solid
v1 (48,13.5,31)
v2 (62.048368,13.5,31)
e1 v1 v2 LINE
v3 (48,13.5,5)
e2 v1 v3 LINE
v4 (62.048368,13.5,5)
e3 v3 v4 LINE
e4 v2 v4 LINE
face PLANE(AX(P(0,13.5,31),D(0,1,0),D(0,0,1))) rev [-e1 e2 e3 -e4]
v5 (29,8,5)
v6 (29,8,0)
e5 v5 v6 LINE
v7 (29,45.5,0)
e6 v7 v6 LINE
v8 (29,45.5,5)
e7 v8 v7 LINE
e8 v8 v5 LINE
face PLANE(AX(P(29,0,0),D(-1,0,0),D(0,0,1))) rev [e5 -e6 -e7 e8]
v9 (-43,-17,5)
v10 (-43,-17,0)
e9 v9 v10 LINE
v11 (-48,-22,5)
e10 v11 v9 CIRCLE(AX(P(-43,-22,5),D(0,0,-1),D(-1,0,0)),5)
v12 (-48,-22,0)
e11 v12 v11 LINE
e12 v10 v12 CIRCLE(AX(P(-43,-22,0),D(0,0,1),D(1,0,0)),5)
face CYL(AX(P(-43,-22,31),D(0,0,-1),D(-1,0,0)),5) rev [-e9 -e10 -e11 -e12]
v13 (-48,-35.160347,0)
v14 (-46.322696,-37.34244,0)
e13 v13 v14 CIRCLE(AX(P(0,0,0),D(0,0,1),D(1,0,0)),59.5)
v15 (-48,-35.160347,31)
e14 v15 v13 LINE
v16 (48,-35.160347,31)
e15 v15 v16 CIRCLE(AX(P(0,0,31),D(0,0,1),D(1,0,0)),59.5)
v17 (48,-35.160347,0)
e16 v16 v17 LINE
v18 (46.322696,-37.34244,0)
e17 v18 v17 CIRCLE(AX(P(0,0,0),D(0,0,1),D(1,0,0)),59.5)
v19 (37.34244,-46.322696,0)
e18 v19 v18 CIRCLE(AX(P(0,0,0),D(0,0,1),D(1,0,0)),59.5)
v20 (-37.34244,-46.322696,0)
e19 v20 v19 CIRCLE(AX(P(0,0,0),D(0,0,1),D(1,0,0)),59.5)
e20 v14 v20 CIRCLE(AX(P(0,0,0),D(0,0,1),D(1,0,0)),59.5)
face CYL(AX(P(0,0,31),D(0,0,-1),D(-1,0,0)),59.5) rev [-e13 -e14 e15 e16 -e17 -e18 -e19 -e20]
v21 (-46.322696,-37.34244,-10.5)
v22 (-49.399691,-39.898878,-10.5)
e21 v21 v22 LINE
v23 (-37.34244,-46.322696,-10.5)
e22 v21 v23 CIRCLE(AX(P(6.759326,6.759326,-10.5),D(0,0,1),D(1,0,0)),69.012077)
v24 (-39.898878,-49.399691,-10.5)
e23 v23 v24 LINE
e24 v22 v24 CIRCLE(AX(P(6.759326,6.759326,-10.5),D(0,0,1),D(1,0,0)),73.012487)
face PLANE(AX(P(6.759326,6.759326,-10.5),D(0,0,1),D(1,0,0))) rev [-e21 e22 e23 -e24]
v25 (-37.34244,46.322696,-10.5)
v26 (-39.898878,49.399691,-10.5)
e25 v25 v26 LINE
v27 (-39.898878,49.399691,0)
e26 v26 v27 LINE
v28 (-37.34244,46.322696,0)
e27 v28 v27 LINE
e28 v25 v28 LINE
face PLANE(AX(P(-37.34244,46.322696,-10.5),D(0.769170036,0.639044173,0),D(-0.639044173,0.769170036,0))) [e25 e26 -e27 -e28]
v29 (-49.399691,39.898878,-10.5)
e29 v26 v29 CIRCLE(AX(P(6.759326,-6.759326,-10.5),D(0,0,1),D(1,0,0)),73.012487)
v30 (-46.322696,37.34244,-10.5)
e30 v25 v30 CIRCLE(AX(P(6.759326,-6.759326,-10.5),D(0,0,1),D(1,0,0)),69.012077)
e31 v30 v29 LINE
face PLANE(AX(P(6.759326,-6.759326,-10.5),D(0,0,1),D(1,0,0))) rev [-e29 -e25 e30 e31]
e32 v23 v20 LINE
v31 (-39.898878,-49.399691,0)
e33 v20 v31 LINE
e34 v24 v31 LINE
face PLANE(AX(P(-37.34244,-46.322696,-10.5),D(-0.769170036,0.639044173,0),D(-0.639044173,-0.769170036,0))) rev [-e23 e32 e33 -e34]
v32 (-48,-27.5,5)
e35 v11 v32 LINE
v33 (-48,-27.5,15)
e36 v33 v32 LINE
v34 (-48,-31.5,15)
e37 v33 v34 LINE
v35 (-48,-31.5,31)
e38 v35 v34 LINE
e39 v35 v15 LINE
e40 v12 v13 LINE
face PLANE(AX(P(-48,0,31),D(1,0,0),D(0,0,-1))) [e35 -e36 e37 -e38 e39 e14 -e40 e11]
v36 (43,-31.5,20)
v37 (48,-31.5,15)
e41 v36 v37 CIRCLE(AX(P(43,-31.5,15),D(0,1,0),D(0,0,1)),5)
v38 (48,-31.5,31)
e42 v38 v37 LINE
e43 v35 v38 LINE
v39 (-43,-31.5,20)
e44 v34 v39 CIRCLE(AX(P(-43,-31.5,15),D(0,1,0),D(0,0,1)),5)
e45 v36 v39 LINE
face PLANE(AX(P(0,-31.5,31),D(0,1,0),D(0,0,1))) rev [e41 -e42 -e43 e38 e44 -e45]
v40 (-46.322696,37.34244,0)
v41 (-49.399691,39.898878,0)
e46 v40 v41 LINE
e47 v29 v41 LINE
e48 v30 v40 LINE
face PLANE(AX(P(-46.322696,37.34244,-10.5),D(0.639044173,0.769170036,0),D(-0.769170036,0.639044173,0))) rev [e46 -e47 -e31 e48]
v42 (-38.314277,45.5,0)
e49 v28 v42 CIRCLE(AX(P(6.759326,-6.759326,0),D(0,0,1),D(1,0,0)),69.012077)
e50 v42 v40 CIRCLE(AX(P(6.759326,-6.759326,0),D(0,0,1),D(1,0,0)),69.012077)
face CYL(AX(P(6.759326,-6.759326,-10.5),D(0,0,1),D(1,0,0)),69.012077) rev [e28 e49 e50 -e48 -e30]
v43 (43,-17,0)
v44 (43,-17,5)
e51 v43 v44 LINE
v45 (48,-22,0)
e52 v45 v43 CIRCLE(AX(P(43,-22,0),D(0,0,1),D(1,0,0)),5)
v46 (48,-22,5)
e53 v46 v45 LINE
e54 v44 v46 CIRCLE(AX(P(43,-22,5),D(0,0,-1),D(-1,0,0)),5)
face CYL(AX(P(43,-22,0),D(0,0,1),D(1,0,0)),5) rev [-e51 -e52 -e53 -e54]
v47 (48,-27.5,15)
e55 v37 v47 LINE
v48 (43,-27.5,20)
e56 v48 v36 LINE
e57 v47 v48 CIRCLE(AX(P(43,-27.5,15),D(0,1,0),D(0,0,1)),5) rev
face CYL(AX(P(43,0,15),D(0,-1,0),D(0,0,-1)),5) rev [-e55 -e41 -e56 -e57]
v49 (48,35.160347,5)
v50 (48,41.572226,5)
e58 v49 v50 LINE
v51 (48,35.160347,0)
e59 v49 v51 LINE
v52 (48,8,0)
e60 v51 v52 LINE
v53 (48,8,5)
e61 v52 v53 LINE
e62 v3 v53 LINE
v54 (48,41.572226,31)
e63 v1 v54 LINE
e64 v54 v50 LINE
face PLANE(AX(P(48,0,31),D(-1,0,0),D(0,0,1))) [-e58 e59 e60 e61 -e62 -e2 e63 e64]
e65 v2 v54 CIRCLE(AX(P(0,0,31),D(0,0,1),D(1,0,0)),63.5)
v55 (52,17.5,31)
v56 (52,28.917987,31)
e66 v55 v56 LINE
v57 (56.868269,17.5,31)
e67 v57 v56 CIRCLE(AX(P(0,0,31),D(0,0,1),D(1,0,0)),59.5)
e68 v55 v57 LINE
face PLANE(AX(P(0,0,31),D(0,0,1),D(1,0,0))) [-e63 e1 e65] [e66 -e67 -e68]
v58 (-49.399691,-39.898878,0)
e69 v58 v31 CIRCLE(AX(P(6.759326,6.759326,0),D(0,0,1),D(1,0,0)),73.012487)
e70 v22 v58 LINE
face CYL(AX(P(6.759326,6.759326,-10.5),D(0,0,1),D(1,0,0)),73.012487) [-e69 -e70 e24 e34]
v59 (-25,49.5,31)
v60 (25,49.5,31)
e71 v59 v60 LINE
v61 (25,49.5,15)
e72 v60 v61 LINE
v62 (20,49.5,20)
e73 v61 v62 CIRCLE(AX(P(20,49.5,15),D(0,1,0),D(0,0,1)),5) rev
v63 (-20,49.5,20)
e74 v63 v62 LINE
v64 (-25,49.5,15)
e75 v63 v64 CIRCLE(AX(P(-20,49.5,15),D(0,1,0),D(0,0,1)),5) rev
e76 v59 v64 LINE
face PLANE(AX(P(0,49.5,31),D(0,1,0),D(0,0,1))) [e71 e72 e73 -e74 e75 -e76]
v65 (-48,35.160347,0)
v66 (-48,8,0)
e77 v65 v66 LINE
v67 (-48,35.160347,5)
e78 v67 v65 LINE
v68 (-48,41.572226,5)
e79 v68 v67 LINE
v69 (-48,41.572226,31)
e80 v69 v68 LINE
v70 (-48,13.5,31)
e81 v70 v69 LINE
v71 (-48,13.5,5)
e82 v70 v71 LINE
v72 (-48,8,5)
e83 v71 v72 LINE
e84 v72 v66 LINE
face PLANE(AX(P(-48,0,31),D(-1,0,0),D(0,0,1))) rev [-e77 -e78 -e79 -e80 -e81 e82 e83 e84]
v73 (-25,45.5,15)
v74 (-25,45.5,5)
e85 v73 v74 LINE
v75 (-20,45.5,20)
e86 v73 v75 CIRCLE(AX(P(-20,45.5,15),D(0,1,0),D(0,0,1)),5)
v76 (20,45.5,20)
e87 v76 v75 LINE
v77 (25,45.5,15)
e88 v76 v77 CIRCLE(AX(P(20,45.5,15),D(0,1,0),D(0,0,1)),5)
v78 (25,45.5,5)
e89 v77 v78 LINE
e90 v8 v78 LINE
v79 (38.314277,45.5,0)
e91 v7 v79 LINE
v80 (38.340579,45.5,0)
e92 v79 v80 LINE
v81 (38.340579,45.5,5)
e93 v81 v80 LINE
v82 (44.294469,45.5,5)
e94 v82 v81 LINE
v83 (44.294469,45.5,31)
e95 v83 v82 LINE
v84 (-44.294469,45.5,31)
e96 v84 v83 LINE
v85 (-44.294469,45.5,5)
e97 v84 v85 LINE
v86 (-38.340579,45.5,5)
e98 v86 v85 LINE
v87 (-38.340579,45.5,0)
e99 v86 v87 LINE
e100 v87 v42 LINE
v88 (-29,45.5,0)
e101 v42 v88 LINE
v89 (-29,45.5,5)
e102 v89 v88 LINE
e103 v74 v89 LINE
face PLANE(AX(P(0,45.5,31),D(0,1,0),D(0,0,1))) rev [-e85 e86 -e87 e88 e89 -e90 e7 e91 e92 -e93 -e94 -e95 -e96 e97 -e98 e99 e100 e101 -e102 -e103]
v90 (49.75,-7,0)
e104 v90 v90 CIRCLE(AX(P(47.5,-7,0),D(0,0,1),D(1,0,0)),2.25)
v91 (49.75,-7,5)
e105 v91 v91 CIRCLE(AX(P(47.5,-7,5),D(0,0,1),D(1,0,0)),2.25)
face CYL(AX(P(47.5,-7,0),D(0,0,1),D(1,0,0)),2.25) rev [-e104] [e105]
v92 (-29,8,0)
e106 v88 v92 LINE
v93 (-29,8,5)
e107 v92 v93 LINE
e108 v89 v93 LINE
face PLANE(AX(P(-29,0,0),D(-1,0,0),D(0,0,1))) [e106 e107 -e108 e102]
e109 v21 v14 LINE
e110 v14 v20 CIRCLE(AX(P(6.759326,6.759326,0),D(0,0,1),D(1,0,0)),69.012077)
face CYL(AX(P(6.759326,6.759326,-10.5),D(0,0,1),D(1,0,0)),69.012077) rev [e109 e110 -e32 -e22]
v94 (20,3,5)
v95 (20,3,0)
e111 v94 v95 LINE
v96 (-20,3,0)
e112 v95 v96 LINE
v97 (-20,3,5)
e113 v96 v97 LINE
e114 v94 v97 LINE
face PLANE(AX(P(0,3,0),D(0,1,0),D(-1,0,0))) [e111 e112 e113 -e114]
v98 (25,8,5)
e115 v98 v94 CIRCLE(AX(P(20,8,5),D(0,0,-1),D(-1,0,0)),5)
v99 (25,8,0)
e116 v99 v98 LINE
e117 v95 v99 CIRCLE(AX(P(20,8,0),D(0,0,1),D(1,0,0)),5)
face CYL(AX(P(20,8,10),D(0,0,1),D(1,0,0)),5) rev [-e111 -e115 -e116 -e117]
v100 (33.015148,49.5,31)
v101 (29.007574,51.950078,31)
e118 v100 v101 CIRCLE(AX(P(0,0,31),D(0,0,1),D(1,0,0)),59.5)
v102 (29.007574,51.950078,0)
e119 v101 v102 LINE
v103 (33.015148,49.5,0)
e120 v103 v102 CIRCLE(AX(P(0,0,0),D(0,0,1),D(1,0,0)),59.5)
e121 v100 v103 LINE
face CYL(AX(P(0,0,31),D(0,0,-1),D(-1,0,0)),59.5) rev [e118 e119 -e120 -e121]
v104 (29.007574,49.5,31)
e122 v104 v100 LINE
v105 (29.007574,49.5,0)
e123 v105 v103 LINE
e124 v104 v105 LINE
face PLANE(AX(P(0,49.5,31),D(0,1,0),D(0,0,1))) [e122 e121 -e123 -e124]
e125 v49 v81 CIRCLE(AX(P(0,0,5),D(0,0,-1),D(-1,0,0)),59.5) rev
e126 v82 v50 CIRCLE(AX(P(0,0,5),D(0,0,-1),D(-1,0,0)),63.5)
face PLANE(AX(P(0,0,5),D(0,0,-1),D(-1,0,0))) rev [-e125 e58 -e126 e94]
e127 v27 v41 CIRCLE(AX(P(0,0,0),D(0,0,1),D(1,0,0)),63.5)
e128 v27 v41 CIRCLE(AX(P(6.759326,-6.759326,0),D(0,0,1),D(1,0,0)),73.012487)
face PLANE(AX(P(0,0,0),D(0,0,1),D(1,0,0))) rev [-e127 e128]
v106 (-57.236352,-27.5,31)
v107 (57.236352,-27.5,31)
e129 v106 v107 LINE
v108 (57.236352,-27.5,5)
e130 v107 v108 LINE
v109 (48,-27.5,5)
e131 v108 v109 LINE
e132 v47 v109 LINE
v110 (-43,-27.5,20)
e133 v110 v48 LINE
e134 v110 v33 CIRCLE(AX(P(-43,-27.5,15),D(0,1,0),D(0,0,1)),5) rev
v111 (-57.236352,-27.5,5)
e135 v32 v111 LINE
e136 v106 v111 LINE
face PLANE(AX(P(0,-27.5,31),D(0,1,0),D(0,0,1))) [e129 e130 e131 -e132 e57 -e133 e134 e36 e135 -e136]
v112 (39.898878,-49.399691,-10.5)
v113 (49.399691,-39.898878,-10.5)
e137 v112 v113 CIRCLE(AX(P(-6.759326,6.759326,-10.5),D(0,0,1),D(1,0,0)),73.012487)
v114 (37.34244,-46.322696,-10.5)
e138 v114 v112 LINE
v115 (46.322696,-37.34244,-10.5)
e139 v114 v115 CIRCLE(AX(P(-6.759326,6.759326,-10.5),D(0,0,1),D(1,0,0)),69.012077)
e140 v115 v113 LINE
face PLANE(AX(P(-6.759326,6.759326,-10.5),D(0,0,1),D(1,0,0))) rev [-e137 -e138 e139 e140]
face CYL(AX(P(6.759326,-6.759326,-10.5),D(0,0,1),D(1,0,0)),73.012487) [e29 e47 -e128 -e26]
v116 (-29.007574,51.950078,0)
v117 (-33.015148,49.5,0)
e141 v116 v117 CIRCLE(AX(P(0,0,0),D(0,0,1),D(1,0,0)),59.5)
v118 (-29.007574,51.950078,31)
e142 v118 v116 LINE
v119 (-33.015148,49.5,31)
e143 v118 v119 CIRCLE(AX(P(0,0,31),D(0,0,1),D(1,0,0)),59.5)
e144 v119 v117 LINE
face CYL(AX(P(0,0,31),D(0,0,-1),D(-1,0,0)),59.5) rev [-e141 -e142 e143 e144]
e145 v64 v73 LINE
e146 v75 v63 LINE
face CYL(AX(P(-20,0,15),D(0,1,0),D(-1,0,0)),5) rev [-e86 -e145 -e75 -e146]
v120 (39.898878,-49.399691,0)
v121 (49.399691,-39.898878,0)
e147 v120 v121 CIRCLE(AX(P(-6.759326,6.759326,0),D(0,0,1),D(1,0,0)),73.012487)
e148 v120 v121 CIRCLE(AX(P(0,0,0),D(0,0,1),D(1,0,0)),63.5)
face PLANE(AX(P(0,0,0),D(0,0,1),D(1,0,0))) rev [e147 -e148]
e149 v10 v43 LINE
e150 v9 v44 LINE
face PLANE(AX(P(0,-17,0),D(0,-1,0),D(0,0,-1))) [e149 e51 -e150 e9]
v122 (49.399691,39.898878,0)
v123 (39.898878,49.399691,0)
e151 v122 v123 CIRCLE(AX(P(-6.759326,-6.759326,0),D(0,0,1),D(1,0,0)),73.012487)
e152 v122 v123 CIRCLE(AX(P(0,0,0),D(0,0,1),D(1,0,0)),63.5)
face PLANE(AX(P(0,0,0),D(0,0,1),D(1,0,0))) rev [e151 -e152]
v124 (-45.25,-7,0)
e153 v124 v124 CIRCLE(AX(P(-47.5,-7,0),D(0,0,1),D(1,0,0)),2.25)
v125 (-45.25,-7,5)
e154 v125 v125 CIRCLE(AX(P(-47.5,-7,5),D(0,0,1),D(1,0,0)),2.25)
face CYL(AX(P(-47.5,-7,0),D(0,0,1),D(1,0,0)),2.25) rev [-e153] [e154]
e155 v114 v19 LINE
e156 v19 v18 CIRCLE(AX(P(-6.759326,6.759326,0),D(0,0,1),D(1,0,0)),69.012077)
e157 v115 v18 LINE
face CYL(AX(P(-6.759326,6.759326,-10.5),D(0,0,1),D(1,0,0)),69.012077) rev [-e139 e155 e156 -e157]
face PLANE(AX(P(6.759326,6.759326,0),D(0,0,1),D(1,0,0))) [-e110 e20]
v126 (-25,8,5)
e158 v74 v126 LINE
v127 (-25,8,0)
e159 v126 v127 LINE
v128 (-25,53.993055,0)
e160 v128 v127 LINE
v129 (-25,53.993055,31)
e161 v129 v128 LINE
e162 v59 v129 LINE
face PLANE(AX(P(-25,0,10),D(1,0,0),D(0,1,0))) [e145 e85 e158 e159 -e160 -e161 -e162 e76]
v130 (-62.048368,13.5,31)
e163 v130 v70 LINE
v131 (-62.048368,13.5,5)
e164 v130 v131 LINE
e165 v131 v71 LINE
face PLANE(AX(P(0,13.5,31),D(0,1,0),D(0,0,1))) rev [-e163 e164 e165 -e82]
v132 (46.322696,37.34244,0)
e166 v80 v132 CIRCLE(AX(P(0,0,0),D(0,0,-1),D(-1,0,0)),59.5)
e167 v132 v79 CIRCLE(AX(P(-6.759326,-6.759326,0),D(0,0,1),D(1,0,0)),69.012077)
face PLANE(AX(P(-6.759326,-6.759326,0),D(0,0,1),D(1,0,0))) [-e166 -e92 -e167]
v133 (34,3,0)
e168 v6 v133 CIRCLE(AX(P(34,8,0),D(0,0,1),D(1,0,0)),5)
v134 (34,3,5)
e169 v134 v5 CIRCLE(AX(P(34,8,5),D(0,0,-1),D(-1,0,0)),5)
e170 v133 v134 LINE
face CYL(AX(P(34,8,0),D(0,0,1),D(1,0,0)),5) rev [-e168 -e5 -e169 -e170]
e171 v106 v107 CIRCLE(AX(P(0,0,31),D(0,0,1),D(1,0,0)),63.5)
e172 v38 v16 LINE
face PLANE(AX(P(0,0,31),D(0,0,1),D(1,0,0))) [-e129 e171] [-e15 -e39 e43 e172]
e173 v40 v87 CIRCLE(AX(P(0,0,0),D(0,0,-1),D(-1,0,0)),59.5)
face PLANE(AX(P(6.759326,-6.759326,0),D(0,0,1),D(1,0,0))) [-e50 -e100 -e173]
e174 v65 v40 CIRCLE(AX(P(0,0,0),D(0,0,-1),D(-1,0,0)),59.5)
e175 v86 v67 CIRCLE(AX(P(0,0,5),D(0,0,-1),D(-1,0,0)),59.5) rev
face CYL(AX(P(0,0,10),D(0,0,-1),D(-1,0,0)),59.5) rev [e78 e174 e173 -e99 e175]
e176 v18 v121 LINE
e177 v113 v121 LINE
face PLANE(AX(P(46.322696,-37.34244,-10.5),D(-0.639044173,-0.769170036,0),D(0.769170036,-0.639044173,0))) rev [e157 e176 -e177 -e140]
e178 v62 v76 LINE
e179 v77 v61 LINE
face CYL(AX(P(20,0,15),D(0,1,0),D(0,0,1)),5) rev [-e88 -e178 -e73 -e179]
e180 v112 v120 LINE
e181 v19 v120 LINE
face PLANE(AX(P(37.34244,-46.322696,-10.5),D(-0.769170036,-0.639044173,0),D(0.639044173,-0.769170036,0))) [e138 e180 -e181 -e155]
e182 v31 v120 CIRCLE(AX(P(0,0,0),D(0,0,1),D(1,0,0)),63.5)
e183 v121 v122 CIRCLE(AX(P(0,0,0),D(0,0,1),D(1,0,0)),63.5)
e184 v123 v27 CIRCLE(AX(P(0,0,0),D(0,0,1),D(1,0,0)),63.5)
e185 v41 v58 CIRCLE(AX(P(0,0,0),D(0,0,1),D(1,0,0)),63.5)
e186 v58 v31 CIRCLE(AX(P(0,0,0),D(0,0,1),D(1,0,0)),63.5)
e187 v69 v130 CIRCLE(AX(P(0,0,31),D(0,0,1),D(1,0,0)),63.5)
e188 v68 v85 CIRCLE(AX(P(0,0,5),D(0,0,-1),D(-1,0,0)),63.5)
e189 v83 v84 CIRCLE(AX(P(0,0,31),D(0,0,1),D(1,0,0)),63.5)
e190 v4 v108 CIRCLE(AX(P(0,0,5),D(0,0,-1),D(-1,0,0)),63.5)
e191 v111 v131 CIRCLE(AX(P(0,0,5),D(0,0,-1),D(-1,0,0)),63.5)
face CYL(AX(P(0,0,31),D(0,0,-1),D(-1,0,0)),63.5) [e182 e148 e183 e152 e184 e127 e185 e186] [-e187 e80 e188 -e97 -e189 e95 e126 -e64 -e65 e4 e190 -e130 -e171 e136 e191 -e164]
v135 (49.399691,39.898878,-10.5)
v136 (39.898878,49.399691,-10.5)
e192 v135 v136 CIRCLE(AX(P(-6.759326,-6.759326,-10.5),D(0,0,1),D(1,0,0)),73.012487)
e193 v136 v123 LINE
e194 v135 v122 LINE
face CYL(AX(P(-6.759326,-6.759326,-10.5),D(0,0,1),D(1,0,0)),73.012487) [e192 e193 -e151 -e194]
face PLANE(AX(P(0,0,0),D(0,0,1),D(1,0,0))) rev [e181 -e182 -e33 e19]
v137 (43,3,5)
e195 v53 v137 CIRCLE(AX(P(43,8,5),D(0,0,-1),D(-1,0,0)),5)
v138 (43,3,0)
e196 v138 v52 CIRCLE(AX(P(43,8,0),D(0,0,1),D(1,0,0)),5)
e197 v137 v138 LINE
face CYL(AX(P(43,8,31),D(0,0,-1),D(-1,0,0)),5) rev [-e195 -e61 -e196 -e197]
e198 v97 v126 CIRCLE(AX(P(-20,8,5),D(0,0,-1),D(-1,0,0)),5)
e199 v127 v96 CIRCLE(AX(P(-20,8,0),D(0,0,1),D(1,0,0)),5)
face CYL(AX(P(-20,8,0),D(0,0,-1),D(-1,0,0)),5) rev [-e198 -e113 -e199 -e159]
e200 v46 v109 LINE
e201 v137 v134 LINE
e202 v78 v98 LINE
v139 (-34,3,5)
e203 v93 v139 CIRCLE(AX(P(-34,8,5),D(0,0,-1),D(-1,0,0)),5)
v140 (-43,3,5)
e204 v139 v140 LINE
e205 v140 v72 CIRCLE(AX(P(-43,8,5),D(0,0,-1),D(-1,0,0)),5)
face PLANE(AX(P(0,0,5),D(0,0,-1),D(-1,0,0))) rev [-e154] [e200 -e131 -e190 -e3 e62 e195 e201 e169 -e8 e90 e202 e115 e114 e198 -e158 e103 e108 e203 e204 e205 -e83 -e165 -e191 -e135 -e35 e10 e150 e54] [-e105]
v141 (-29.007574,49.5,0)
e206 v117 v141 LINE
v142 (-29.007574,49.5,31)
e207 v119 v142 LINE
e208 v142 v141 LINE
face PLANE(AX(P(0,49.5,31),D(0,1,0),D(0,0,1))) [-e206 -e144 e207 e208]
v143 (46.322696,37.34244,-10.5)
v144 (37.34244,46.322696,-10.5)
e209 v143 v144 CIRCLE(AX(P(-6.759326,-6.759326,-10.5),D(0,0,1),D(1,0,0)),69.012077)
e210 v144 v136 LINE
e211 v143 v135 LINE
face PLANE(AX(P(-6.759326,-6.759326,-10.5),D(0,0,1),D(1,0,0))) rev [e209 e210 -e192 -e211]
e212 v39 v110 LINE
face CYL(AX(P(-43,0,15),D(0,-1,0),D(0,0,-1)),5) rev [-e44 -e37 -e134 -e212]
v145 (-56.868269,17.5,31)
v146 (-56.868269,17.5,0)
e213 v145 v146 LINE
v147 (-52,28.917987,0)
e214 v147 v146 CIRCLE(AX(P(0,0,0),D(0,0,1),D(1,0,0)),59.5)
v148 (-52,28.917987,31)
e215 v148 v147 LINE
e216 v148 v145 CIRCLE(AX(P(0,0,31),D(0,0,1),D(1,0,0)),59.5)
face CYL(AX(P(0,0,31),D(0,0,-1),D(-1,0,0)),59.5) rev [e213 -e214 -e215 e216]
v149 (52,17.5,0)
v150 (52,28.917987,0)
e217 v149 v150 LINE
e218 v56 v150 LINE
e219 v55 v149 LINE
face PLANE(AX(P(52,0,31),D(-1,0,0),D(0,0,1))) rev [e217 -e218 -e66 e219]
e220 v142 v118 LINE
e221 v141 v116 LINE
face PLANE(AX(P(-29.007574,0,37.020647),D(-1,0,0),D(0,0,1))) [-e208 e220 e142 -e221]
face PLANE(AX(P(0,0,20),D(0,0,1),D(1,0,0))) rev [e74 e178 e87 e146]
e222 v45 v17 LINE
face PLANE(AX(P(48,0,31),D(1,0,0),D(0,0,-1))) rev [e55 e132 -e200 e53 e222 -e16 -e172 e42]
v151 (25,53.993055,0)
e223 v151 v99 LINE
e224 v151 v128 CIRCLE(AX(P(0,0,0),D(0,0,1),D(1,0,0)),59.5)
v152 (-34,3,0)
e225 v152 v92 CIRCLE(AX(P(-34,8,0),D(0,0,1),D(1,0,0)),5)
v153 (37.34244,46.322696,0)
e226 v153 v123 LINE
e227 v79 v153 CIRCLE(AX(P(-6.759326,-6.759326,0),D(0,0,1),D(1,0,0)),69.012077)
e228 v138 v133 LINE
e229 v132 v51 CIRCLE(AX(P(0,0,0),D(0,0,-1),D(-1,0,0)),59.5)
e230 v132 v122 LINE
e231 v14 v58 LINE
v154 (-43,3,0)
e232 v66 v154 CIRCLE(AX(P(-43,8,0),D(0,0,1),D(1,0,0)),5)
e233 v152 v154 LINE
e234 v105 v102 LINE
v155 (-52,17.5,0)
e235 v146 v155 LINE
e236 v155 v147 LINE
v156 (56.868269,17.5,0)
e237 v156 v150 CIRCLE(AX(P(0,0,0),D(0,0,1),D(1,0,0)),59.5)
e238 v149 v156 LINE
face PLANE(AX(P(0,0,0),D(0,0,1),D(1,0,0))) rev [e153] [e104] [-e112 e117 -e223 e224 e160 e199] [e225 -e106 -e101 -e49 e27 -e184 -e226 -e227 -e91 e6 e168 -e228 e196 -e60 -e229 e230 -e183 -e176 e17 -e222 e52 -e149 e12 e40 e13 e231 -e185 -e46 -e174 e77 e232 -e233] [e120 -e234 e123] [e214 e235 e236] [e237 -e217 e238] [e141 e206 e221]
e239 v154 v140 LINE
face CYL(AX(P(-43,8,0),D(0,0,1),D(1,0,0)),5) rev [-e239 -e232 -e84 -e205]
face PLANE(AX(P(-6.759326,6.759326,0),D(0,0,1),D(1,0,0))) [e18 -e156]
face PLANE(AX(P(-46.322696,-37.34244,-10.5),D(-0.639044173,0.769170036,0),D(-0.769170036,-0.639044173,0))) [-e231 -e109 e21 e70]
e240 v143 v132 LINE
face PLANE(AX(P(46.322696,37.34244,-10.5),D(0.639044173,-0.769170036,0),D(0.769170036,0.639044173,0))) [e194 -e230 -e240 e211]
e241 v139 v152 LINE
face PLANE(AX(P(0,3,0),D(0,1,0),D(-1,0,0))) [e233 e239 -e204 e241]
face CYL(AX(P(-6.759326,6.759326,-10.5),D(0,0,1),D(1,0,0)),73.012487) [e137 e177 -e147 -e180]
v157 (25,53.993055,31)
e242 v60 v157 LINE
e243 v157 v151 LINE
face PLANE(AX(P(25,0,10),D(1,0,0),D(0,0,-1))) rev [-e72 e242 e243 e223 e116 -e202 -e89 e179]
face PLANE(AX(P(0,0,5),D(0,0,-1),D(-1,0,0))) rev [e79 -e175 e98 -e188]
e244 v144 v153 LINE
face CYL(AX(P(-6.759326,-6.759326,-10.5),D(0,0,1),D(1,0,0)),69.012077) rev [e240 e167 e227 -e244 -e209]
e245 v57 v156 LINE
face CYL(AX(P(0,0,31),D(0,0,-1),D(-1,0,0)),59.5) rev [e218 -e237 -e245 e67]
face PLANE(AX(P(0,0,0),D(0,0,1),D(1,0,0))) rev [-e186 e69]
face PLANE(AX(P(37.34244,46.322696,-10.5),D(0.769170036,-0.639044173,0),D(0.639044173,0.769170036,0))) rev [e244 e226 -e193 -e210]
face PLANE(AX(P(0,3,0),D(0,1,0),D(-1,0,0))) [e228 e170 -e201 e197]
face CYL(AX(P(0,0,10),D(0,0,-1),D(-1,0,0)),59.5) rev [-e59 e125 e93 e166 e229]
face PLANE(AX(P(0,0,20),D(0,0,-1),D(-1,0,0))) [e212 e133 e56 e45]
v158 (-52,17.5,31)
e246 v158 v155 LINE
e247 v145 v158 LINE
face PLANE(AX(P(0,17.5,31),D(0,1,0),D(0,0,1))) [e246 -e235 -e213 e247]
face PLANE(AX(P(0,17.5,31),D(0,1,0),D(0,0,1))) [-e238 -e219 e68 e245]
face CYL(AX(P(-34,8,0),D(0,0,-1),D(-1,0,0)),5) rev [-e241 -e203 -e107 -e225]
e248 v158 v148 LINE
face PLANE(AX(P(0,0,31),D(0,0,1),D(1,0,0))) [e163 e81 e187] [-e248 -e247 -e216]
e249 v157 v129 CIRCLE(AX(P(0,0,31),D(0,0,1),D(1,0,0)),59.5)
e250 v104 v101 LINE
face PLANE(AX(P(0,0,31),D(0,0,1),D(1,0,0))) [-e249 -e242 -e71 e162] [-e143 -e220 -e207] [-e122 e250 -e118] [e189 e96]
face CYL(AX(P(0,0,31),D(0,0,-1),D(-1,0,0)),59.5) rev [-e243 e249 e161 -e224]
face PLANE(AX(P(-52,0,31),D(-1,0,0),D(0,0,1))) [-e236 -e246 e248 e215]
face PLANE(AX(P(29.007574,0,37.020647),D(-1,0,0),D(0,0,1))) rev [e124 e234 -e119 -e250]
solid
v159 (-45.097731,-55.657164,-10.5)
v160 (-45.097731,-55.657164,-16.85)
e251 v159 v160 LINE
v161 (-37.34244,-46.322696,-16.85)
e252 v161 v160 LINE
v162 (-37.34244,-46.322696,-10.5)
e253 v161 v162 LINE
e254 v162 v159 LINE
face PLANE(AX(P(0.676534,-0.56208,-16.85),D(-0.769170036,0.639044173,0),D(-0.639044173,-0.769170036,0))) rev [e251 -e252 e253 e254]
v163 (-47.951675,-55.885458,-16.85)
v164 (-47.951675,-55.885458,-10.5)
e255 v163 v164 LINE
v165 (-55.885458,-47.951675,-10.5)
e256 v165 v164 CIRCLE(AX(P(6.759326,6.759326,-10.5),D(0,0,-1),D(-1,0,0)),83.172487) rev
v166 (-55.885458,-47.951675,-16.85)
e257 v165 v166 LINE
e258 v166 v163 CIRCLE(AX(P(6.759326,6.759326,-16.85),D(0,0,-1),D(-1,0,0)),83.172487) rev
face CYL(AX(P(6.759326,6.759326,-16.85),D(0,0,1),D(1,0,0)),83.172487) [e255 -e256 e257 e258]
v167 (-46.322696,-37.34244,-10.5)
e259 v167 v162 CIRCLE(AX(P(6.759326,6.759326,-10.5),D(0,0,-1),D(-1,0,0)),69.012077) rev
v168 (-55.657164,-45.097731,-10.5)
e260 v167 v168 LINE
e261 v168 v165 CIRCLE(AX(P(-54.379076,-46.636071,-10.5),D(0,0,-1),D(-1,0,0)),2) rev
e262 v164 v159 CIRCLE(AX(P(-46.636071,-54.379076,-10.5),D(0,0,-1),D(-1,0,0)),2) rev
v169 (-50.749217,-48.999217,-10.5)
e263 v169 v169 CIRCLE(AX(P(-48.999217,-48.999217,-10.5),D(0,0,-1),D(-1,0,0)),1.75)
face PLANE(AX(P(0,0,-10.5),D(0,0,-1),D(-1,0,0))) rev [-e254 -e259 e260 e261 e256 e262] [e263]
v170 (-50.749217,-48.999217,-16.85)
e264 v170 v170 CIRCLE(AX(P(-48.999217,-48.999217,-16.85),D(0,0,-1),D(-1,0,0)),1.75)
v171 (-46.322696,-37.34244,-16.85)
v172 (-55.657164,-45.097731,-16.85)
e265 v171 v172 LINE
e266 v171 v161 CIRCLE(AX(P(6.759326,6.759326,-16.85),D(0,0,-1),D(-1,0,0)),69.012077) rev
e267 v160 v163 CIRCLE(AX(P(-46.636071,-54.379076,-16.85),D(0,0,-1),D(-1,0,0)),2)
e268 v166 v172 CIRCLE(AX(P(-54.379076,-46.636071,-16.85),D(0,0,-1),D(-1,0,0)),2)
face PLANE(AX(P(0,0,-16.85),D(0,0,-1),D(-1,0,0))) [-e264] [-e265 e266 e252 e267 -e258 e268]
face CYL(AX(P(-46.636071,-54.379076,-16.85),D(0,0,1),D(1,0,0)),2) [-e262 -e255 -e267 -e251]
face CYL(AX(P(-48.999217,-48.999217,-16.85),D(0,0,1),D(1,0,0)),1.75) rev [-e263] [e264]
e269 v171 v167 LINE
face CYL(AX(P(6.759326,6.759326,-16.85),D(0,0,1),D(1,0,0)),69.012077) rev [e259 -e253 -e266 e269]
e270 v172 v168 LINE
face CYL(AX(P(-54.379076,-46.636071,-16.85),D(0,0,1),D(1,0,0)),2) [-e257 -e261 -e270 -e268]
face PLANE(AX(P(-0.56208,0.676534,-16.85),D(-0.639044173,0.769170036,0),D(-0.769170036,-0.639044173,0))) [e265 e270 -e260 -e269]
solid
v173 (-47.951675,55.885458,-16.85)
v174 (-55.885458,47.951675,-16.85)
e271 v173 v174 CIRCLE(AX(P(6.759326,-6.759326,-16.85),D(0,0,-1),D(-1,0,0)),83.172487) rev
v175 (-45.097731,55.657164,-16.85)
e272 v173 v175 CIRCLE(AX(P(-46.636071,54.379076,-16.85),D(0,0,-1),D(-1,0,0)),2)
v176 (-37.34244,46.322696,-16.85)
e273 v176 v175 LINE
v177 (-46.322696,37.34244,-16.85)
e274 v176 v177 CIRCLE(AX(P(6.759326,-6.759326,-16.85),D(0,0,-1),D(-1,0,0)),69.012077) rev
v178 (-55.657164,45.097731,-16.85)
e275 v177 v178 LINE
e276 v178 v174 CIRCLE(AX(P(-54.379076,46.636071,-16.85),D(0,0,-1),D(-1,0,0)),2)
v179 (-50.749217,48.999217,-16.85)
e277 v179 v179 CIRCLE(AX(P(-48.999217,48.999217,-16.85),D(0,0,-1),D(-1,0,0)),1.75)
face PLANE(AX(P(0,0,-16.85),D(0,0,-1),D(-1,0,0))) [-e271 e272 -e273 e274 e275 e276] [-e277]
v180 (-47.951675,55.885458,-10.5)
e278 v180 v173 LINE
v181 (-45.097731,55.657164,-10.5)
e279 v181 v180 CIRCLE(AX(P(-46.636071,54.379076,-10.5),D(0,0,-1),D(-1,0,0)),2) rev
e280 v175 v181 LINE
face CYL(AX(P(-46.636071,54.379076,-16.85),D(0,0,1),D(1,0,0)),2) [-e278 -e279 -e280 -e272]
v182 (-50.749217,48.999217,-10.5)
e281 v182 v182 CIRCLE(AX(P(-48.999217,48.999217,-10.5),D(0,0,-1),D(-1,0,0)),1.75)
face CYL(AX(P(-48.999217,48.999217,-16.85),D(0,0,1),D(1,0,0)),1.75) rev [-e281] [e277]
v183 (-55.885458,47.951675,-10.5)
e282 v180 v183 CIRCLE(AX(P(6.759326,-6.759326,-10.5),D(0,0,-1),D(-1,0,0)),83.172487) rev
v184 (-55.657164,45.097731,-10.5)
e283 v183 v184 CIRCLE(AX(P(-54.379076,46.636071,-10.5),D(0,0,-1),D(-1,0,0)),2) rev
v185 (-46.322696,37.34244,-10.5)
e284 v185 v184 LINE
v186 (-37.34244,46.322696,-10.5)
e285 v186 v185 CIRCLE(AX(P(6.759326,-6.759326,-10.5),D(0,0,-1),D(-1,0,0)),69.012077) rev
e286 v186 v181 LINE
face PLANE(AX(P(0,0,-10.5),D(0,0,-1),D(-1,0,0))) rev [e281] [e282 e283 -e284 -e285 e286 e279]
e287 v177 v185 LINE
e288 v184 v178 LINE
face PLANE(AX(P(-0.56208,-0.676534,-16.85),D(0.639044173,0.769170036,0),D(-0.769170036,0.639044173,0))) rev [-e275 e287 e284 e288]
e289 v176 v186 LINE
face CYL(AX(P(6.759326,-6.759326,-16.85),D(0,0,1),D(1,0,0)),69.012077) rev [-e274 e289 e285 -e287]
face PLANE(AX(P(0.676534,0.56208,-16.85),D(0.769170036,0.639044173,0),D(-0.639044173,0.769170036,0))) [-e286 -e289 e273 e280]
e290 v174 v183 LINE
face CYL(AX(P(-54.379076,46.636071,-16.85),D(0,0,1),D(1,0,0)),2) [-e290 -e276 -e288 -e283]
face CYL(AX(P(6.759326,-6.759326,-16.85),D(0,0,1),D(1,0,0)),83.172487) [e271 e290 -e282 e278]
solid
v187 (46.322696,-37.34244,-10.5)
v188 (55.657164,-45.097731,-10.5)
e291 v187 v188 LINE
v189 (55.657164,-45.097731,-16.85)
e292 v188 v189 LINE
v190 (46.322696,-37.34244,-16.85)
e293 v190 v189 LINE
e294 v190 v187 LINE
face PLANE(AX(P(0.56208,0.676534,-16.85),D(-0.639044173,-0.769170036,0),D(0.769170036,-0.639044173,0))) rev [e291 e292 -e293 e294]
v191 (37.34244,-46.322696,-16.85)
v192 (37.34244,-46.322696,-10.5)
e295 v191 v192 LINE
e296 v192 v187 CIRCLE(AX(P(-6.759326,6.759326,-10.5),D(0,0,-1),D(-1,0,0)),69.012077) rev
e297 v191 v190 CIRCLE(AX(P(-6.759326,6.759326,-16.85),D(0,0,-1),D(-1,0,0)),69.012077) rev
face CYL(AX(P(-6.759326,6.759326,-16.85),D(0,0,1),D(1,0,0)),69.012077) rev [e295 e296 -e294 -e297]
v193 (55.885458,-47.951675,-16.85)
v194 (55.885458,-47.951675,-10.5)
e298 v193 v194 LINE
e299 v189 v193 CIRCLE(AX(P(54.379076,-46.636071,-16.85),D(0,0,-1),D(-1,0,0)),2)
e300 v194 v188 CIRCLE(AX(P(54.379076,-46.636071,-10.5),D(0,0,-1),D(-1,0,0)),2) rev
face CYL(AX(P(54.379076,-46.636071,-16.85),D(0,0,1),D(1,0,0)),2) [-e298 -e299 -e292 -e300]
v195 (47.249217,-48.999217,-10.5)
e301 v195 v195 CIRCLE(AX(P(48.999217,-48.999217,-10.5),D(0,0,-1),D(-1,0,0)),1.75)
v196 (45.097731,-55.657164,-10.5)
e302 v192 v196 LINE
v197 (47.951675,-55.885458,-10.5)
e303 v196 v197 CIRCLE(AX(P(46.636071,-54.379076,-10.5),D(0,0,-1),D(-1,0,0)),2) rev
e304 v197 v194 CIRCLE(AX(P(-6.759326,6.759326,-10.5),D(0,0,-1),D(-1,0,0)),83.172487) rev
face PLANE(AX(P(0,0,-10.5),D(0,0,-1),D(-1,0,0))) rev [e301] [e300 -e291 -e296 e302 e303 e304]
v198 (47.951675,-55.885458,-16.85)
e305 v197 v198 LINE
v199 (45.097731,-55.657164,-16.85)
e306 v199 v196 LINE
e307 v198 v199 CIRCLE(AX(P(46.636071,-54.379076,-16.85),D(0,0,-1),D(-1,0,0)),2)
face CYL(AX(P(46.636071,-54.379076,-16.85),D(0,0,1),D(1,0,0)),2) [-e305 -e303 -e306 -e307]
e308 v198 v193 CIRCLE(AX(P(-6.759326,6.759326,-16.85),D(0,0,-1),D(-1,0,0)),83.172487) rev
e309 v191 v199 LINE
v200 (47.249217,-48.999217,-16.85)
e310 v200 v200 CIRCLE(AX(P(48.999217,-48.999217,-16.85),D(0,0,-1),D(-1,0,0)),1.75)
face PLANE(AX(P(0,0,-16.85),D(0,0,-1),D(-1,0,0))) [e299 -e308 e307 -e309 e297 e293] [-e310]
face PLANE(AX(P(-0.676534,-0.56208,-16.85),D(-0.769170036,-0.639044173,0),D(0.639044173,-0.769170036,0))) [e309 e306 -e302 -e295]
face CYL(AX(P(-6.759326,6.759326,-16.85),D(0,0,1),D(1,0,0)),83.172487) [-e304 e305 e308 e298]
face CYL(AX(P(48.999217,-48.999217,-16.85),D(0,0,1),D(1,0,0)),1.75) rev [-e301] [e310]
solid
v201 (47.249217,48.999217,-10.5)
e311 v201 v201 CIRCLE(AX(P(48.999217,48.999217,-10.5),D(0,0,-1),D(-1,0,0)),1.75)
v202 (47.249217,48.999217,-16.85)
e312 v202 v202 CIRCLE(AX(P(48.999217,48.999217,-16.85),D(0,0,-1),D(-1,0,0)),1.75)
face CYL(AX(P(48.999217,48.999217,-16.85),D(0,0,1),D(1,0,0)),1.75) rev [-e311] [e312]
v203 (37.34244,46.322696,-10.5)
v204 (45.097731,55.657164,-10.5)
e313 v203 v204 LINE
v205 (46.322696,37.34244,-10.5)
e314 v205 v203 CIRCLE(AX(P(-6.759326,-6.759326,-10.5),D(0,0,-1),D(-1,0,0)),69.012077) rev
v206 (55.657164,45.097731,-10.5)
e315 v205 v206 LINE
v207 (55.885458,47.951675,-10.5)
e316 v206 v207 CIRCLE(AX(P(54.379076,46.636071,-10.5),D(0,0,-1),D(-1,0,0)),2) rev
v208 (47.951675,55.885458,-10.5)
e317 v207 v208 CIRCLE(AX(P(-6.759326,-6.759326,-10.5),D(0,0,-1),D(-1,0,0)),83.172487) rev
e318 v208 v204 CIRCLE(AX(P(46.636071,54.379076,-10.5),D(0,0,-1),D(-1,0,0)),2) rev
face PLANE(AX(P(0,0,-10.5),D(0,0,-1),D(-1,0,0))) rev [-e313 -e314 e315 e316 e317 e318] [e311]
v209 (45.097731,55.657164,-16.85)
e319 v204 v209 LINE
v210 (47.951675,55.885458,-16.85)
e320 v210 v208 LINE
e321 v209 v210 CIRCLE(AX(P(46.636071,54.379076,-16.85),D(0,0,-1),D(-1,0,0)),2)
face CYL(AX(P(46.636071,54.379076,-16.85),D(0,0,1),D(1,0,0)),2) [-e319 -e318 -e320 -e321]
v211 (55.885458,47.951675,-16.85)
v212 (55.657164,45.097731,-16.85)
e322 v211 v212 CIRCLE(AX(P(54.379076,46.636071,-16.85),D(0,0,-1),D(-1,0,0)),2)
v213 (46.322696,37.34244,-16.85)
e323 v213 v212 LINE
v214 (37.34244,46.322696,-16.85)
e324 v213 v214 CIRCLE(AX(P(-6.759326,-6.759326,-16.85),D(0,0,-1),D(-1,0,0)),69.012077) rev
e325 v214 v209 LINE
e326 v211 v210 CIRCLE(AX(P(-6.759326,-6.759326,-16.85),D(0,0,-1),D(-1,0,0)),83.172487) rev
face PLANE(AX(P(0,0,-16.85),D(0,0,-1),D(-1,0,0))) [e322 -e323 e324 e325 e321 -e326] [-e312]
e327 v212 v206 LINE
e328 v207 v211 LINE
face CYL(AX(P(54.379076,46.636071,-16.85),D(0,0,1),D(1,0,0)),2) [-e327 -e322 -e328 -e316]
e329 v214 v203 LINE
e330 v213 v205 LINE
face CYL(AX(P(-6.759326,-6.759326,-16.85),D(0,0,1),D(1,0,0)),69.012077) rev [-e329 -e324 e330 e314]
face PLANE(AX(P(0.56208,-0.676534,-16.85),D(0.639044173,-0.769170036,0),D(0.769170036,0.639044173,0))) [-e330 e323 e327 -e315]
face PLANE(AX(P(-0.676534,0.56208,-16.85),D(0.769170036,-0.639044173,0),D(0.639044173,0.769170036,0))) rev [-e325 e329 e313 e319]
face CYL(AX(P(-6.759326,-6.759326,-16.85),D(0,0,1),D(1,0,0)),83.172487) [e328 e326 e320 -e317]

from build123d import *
from build123d.topology import SkipClean

# Parameters (mm, degrees)
BOSS_EXTRUDE1_DEPTH   = 31
BOSS_EXTRUDE3_DEPTH   = 10
BOSS_EXTRUDE4_DEPTH   = 5
SKETCH6_W             = 19
SKETCH6_H             = 10.5
SKETCH6_R             = 2.25
SKETCH6_W_2           = 50
SKETCH6_W_3           = 96
CUT_EXTRUDE1_DEPTH    = 94.490641243
CUT_EXTRUDE2_DEPTH    = 10
SKETCH9_W             = 96
SKETCH9_H             = 4
SKETCH9_W_2           = 19
SKETCH9_W_3           = 50
CUT_EXTRUDE4_DEPTH    = 20
BOSS_EXTRUDE5_DEPTH   = 31
FILLET3_R             = 5
SKETCH11_W            = 96
SKETCH11_H            = 42.5
CUT_EXTRUDE5_DEPTH    = 26
BOSS_EXTRUDE6_DEPTH   = 10.5
BOSS_EXTRUDE7_DEPTH   = 6.35
BOSS_EXTRUDE7_2_DEPTH = 6.35
BOSS_EXTRUDE7_3_DEPTH = 6.35
BOSS_EXTRUDE7_4_DEPTH = 6.35
FILLET4_R             = 2
FILLET7_R             = 2
FILLET8_R             = 2
FILLET9_R             = 2


with BuildPart() as part:
    # Sketch1 → Boss-Extrude1 (new body)
    with BuildSketch(Plane.XY):
        with BuildLine():
            ThreePointArc((-50.477717856, -31.5), (-51.659400485, -29.522133079), (-52.763623833, -27.5))
            Line((-52.763623833, -27.5), (-57.236352085, -27.5))
            ThreePointArc((-57.236352085, -27.5), (0, -63.5), (57.236352085, -27.5))
            Line((57.236352085, -27.5), (52.763623833, -27.5))
            ThreePointArc((52.763623833, -27.5), (51.659400485, -29.522133079), (50.477717856, -31.5))
            ThreePointArc((50.477717856, -31.5), (49.272860314, -33.353189299), (48, -35.160346983))
            ThreePointArc((48, -35.160346983), (0, -59.5), (-48, -35.160346983))
            ThreePointArc((-48, -35.160346983), (-49.272860314, -33.353189299), (-50.477717856, -31.5))
        make_face()
        with BuildLine():
            Line((52.763623833, -27.5), (-52.763623833, -27.5))
            ThreePointArc((-52.763623833, -27.5), (-51.659400485, -29.522133079), (-50.477717856, -31.5))
            Line((-50.477717856, -31.5), (-48, -31.5))
            Line((-48, -31.5), (48, -31.5))
            Line((48, -31.5), (50.477717856, -31.5))
            ThreePointArc((50.477717856, -31.5), (51.659400485, -29.522133079), (52.763623833, -27.5))
        make_face()
        with BuildLine():
            ThreePointArc((-56.868268832, 17.5), (-57.443088433, 15.50940332), (-57.948252778, 13.5))
            Line((-57.948252778, 13.5), (57.948252778, 13.5))
            ThreePointArc((57.948252778, 13.5), (57.443088433, 15.50940332), (56.868268832, 17.5))
            Line((56.868268832, 17.5), (52, 17.5))
            Line((52, 17.5), (48, 17.5))
            Line((48, 17.5), (-48, 17.5))
            Line((-48, 17.5), (-52, 17.5))
            Line((-52, 17.5), (-56.868268832, 17.5))
        make_face()
        with BuildLine():
            Line((-52, 28.917987482), (-52, 17.5))
            Line((-52, 17.5), (-48, 17.5))
            Line((-48, 17.5), (-48, 35.160346983))
            ThreePointArc((-48, 35.160346983), (-50.097322913, 32.101530134), (-52, 28.917987482))
        make_face()
        with BuildLine():
            Line((-62.04836823, 13.5), (-57.948252778, 13.5))
            ThreePointArc((-57.948252778, 13.5), (-57.443088433, 15.50940332), (-56.868268832, 17.5))
            ThreePointArc((-56.868268832, 17.5), (-54.732692234, 23.336289354), (-52, 28.917987482))
            ThreePointArc((-52, 28.917987482), (-50.097322913, 32.101530134), (-48, 35.160346983))
            Line((-48, 35.160346983), (-48, 41.572226306))
            ThreePointArc((-48, 41.572226306), (-56.78620704, 28.417893835), (-62.04836823, 13.5))
        make_face()
        with BuildLine():
            ThreePointArc((56.868268832, 17.5), (57.443088433, 15.50940332), (57.948252778, 13.5))
            Line((57.948252778, 13.5), (62.04836823, 13.5))
            ThreePointArc((62.04836823, 13.5), (56.78620704, 28.417893835), (48, 41.572226306))
            Line((48, 41.572226306), (48, 35.160346983))
            ThreePointArc((48, 35.160346983), (50.097322913, 32.101530134), (52, 28.917987482))
            ThreePointArc((52, 28.917987482), (54.732692234, 23.336289354), (56.868268832, 17.5))
        make_face()
        with BuildLine():
            Line((48, 17.5), (52, 17.5))
            Line((52, 17.5), (52, 28.917987482))
            ThreePointArc((52, 28.917987482), (50.097322913, 32.101530134), (48, 35.160346983))
            Line((48, 35.160346983), (48, 17.5))
        make_face()
        with BuildLine():
            ThreePointArc((44.294469181, 45.5), (0, 63.5), (-44.294469181, 45.5))
            Line((-44.294469181, 45.5), (-38.340579025, 45.5))
            ThreePointArc((-38.340579025, 45.5), (-35.733876731, 47.574573606), (-33.015148038, 49.5))
            ThreePointArc((-33.015148038, 49.5), (0, 59.5), (33.015148038, 49.5))
            ThreePointArc((33.015148038, 49.5), (35.733876731, 47.574573606), (38.340579025, 45.5))
            Line((38.340579025, 45.5), (44.294469181, 45.5))
        make_face()
        with BuildLine():
            ThreePointArc((-33.015148038, 49.5), (-35.733876731, 47.574573606), (-38.340579025, 45.5))
            Line((-38.340579025, 45.5), (38.340579025, 45.5))
            ThreePointArc((38.340579025, 45.5), (35.733876731, 47.574573606), (33.015148038, 49.5))
            Line((33.015148038, 49.5), (-33.015148038, 49.5))
        make_face()
        with BuildLine():
            ThreePointArc((48, -35.160346983), (49.272860314, -33.353189299), (50.477717856, -31.5))
            Line((50.477717856, -31.5), (48, -31.5))
            Line((48, -31.5), (48, -35.160346983))
        make_face()
        with BuildLine():
            Line((-48, -31.5), (-50.477717856, -31.5))
            ThreePointArc((-50.477717856, -31.5), (-49.272860314, -33.353189299), (-48, -35.160346983))
            Line((-48, -35.160346983), (-48, -31.5))
        make_face()
    extrude(amount=BOSS_EXTRUDE1_DEPTH)

    # Sketch2 → Boss-Extrude3 (add)
    with SkipClean():  # the faces are left unmerged after this step: merging them gives an invalid solid
        with BuildSketch(Plane(origin=(0, 0, 0), x_dir=(-1, 0, 0), z_dir=(0, 0, -1))):
            with BuildLine():
                ThreePointArc((48, 41.572226306), (46.189004231, 43.575519367), (44.294469181, 45.5))
                Line((44.294469181, 45.5), (25, 45.5))
                Line((25, 45.5), (25, 17.5))
                Line((25, 17.5), (48, 17.5))
                Line((48, 17.5), (48, 41.572226306))
            make_face()
            with BuildLine():
                Line((-25, 45.5), (-44.294469181, 45.5))
                ThreePointArc((-44.294469181, 45.5), (-46.189004231, 43.575519367), (-48, 41.572226306))
                Line((-48, 41.572226306), (-48, 17.5))
                Line((-48, 17.5), (-25, 17.5))
                Line((-25, 17.5), (-25, 45.5))
            make_face()
        extrude(amount=-BOSS_EXTRUDE3_DEPTH)

    # Sketch4 → Boss-Extrude4 (add)
    with SkipClean():  # the faces are left unmerged after this step: merging them gives an invalid solid
        with BuildSketch(Plane(origin=(0, 0, 0), x_dir=(-1, 0, 0), z_dir=(0, 0, -1))):
            with BuildLine():
                Line((-57.236352085, -27.5), (57.236352085, -27.5))
                ThreePointArc((57.236352085, -27.5), (63.067116036, -7.401950746), (62.04836823, 13.5))
                Line((62.04836823, 13.5), (-62.04836823, 13.5))
                ThreePointArc((-62.04836823, 13.5), (-63.067116036, -7.401950746), (-57.236352085, -27.5))
            make_face()
        extrude(amount=-BOSS_EXTRUDE4_DEPTH)

    # Sketch6 → Cut-Extrude1 (cut, through all)
    with SkipClean():  # the faces are left unmerged after this step: merging them gives an invalid solid
        with BuildSketch(Plane.XY.offset(5)):
            with Locations((-38.5, 8.25)):
                Rectangle(SKETCH6_W, SKETCH6_H)
            with Locations((-47.5, -7)):
                Circle(SKETCH6_R)
            with Locations((0, 8.25)):
                Rectangle(SKETCH6_W_2, SKETCH6_H)
            with Locations((0, -22.25)):
                Rectangle(SKETCH6_W_3, SKETCH6_H)
            with Locations((38.5, 8.25)):
                Rectangle(SKETCH6_W, SKETCH6_H)
            with Locations((47.5, -7)):
                Circle(SKETCH6_R)
        extrude(amount=-CUT_EXTRUDE1_DEPTH, mode=Mode.SUBTRACT)

    # Sketch7 → Cut-Extrude2 (cut)
    with SkipClean():  # the faces are left unmerged after this step: merging them gives an invalid solid
        with BuildSketch(Plane(origin=(0, 0, 0), x_dir=(-1, 0, 0), z_dir=(0, 0, -1))):
            with BuildLine():
                Line((-29, 17.5), (-48, 17.5))
                Line((-48, 17.5), (-48, 35.160346983))
                ThreePointArc((-48, 35.160346983), (-43.478741964, 40.618333265), (-38.340579025, 45.5))
                Line((-38.340579025, 45.5), (-29, 45.5))
                Line((-29, 45.5), (-29, 17.5))
            make_face()
            with BuildLine():
                Line((29, 17.5), (48, 17.5))
                Line((48, 17.5), (48, 35.160346983))
                ThreePointArc((48, 35.160346983), (43.478741964, 40.618333265), (38.340579025, 45.5))
                Line((38.340579025, 45.5), (29, 45.5))
                Line((29, 45.5), (29, 17.5))
            make_face()
        extrude(amount=-CUT_EXTRUDE2_DEPTH, mode=Mode.SUBTRACT)

    # Sketch9 → Cut-Extrude4 (cut)
    with SkipClean():  # the faces are left unmerged after this step: merging them gives an invalid solid
        with BuildSketch(Plane(origin=(0, 0, 0), x_dir=(-1, 0, 0), z_dir=(0, 0, -1))):
            with Locations((0, -29.5)):
                Rectangle(SKETCH9_W, SKETCH9_H)
            with Locations((-38.5, 15.5)):
                Rectangle(SKETCH9_W_2, SKETCH9_H)
            with Locations((0, 15.5)):
                Rectangle(SKETCH9_W_3, SKETCH9_H)
            with Locations((38.5, 15.5)):
                Rectangle(SKETCH9_W_2, SKETCH9_H)
            with Locations((0, 47.5)):
                Rectangle(SKETCH9_W_3, SKETCH9_H)
        extrude(amount=-CUT_EXTRUDE4_DEPTH, mode=Mode.SUBTRACT)

    # Sketch10 → Boss-Extrude5 (add)
    with SkipClean():  # the faces are left unmerged after this step: merging them gives an invalid solid
        with BuildSketch(Plane(origin=(0, 0, 0), x_dir=(-1, 0, 0), z_dir=(0, 0, -1))):
            with BuildLine():
                Line((-29.007574019, 51.950078436), (-29.007574019, 49.5))
                Line((-29.007574019, 49.5), (-25, 49.5))
                Line((-25, 49.5), (-25, 53.993055109))
                ThreePointArc((-25, 53.993055109), (-27.023100327, 53.009452447), (-29.007574019, 51.950078436))
            make_face()
            with BuildLine():
                ThreePointArc((29.007574019, 51.950078436), (27.023100327, 53.009452447), (25, 53.993055109))
                Line((25, 53.993055109), (25, 49.5))
                Line((25, 49.5), (29.007574019, 49.5))
                Line((29.007574019, 49.5), (29.007574019, 51.950078436))
            make_face()
        extrude(amount=-BOSS_EXTRUDE5_DEPTH)

    # Fillet3
    # the kernel refuses this fillet: 5 mm, written as the material it adds along each edge
    with BuildSketch(Plane(origin=(48, -17, 5), x_dir=(-1, 0, 0), z_dir=(0, 0, -1)), Plane(origin=(-48, -17, 5), x_dir=(0, -1, 0), z_dir=(0, 0, -1)), Plane(origin=(-29, 3, 5), x_dir=(0, 1, 0), z_dir=(0, 0, -1)), Plane(origin=(25, 3, 5), x_dir=(0, 1, 0), z_dir=(0, 0, -1)), Plane(origin=(48, 3, 5), x_dir=(0, 1, 0), z_dir=(0, 0, -1))) as fillet3_piece_1:
        with BuildLine():
            CenterArc((FILLET3_R, -FILLET3_R), FILLET3_R, 90, 90)
            Line((0, -FILLET3_R), (0, 0))
            Line((0, 0), (FILLET3_R, 0))
        make_face()
    extrude(amount=5)
    with BuildSketch(Plane(origin=(-48, 3, 5), x_dir=(0, 1, 0), z_dir=(0, 0, -1)), Plane(origin=(-25, 3, 5), x_dir=(0, 1, 0), z_dir=(0, 0, -1)), Plane(origin=(29, 3, 5), x_dir=(0, 1, 0), z_dir=(0, 0, -1))) as fillet3_piece_2:
        with BuildLine():
            CenterArc((FILLET3_R, FILLET3_R), FILLET3_R, 180, 90)
            Line((0, FILLET3_R), (0, 0))
            Line((0, 0), (FILLET3_R, 0))
        make_face()
    extrude(amount=5)
    with BuildSketch(Plane(origin=(48, -31.5, 20), x_dir=(0, 0, -1), z_dir=(0, 1, 0)), Plane(origin=(25, 49.5, 20), x_dir=(-1, 0, 0), z_dir=(0, -1, 0)), Plane(origin=(-29, 13.5, 20), x_dir=(0, 0, -1), z_dir=(0, 1, 0)), Plane(origin=(-48, 17.5, 20), x_dir=(0, 0, -1), z_dir=(0, -1, 0)), Plane(origin=(25, 13.5, 20), x_dir=(0, 0, -1), z_dir=(0, 1, 0))) as fillet3_piece_3:
        with BuildLine():
            CenterArc((FILLET3_R, FILLET3_R), FILLET3_R, 180, 90)
            Line((0, FILLET3_R), (0, 0))
            Line((0, 0), (FILLET3_R, 0))
        make_face()
    extrude(amount=4)
    with BuildSketch(Plane(origin=(-48, -27.5, 20), x_dir=(1, 0, 0), z_dir=(0, -1, 0)), Plane(origin=(-25, 45.5, 20), x_dir=(0, 0, -1), z_dir=(0, 1, 0)), Plane(origin=(-25, 17.5, 20), x_dir=(1, 0, 0), z_dir=(0, -1, 0)), Plane(origin=(48, 13.5, 20), x_dir=(-1, 0, 0), z_dir=(0, 1, 0)), Plane(origin=(29, 17.5, 20), x_dir=(1, 0, 0), z_dir=(0, -1, 0))) as fillet3_piece_4:
        with BuildLine():
            CenterArc((FILLET3_R, -FILLET3_R), FILLET3_R, 90, 90)
            Line((0, -FILLET3_R), (0, 0))
            Line((0, 0), (FILLET3_R, 0))
        make_face()
    extrude(amount=4)

    # Sketch11 → Cut-Extrude5 (cut)
    with BuildSketch(Plane.XY.offset(31)):
        with Locations((0, 24.25)):
            Rectangle(SKETCH11_W, SKETCH11_H)
    extrude(amount=-CUT_EXTRUDE5_DEPTH, mode=Mode.SUBTRACT)

    # Sketch12 → Boss-Extrude6 (add)
    with BuildSketch(Plane(origin=(0, 0, 0), x_dir=(-1, 0, 0), z_dir=(0, 0, -1))):
        with BuildLine():
            Line((46.322696115, -37.342439994), (49.399691297, -39.898878427))
            ThreePointArc((49.399691297, -39.898878427), (44.8682987, -44.8682987), (39.898878427, -49.399691297))
            Line((39.898878427, -49.399691297), (37.342439994, -46.322696115))
            ThreePointArc((37.342439994, -46.322696115), (42.039581957, -42.039581957), (46.322696115, -37.342439994))
        make_face()
        with BuildLine():
            Line((-46.322696115, -37.342439994), (-49.399691297, -39.898878427))
            ThreePointArc((-49.399691297, -39.898878427), (-44.8682987, -44.8682987), (-39.898878427, -49.399691297))
            Line((-39.898878427, -49.399691297), (-37.342439994, -46.322696115))
            ThreePointArc((-37.342439994, -46.322696115), (-42.039581957, -42.039581957), (-46.322696115, -37.342439994))
        make_face()
        with BuildLine():
            Line((-37.342439994, 46.322696115), (-39.898878427, 49.399691297))
            ThreePointArc((-39.898878427, 49.399691297), (-44.8682987, 44.8682987), (-49.399691297, 39.898878427))
            Line((-49.399691297, 39.898878427), (-46.322696115, 37.342439994))
            ThreePointArc((-46.322696115, 37.342439994), (-42.039581957, 42.039581957), (-37.342439994, 46.322696115))
        make_face()
        with BuildLine():
            Line((46.322696115, 37.342439994), (49.399691297, 39.898878427))
            ThreePointArc((49.399691297, 39.898878427), (44.8682987, 44.8682987), (39.898878427, 49.399691297))
            Line((39.898878427, 49.399691297), (37.342439994, 46.322696115))
            ThreePointArc((37.342439994, 46.322696115), (42.039581957, 42.039581957), (46.322696115, 37.342439994))
        make_face()
    extrude(amount=BOSS_EXTRUDE6_DEPTH)


with BuildPart() as body_2:
    # Sketch14 → Boss-Extrude7 (new body)
    with BuildSketch(Plane(origin=(0, 0, -10.5), x_dir=(-1, 0, 0), z_dir=(0, 0, -1))):
        with BuildLine():
            Line((57.214458866, -46.391567227), (46.322696115, -37.342439994))
            ThreePointArc((46.322696115, -37.342439994), (42.039581957, -42.039581957), (37.342439994, -46.322696115))
            Line((37.342439994, -46.322696115), (46.391567227, -57.214458866))
            ThreePointArc((46.391567227, -57.214458866), (52.052503596, -52.052503596), (57.214458866, -46.391567227))
        make_face()
        with BuildLine():
            ThreePointArc((50.236653382, -50.236653382), (47.761779648, -50.236653382), (47.761779648, -47.761779648))
            ThreePointArc((47.761779648, -47.761779648), (50.236653382, -47.761779648), (50.236653382, -50.236653382))
        make_face(mode=Mode.SUBTRACT)
    extrude(amount=BOSS_EXTRUDE7_DEPTH)

    # Fillet8
    fillet8_edges = [body_2.edges().sort_by_distance(p)[0] for p in [
        (-46.391567227, -57.214458866, -13.675),
        (-57.214458866, -46.391567227, -13.675),
    ]]
    fillet(fillet8_edges, radius=FILLET8_R)


with BuildPart() as body_3:
    # Sketch14 → Boss-Extrude7 2 (new body)
    with BuildSketch(Plane(origin=(0, 0, -10.5), x_dir=(-1, 0, 0), z_dir=(0, 0, -1))):
        with BuildLine():
            Line((-46.391567227, -57.214458866), (-37.342439994, -46.322696115))
            ThreePointArc((-37.342439994, -46.322696115), (-42.039581957, -42.039581957), (-46.322696115, -37.342439994))
            Line((-46.322696115, -37.342439994), (-57.214458866, -46.391567227))
            ThreePointArc((-57.214458866, -46.391567227), (-52.052503596, -52.052503596), (-46.391567227, -57.214458866))
        make_face()
        with BuildLine():
            ThreePointArc((-50.236653382, -50.236653382), (-50.236653382, -47.761779648), (-47.761779648, -47.761779648))
            ThreePointArc((-47.761779648, -47.761779648), (-47.761779648, -50.236653382), (-50.236653382, -50.236653382))
        make_face(mode=Mode.SUBTRACT)
    extrude(amount=BOSS_EXTRUDE7_2_DEPTH)

    # Fillet7
    fillet7_edges = [body_3.edges().sort_by_distance(p)[0] for p in [
        (46.391567227, -57.214458866, -13.675),
        (57.214458866, -46.391567227, -13.675),
    ]]
    fillet(fillet7_edges, radius=FILLET7_R)


with BuildPart() as body_4:
    # Sketch14 → Boss-Extrude7 3 (new body)
    with BuildSketch(Plane(origin=(0, 0, -10.5), x_dir=(-1, 0, 0), z_dir=(0, 0, -1))):
        with BuildLine():
            Line((-57.214458866, 46.391567227), (-46.322696115, 37.342439994))
            ThreePointArc((-46.322696115, 37.342439994), (-42.039581957, 42.039581957), (-37.342439994, 46.322696115))
            Line((-37.342439994, 46.322696115), (-46.391567227, 57.214458866))
            ThreePointArc((-46.391567227, 57.214458866), (-52.052503596, 52.052503596), (-57.214458866, 46.391567227))
        make_face()
        with BuildLine():
            ThreePointArc((-50.236653382, 50.236653382), (-47.761779648, 50.236653382), (-47.761779648, 47.761779648))
            ThreePointArc((-47.761779648, 47.761779648), (-50.236653382, 47.761779648), (-50.236653382, 50.236653382))
        make_face(mode=Mode.SUBTRACT)
    extrude(amount=BOSS_EXTRUDE7_3_DEPTH)

    # Fillet4
    fillet4_edges = [body_4.edges().sort_by_distance(p)[0] for p in [
        (57.214458866, 46.391567227, -13.675),
        (46.391567227, 57.214458866, -13.675),
    ]]
    fillet(fillet4_edges, radius=FILLET4_R)


with BuildPart() as body_5:
    # Sketch14 → Boss-Extrude7 4 (new body)
    with BuildSketch(Plane(origin=(0, 0, -10.5), x_dir=(-1, 0, 0), z_dir=(0, 0, -1))):
        with BuildLine():
            Line((46.391567227, 57.214458866), (37.342439994, 46.322696115))
            ThreePointArc((37.342439994, 46.322696115), (42.039581957, 42.039581957), (46.322696115, 37.342439994))
            Line((46.322696115, 37.342439994), (57.214458866, 46.391567227))
            ThreePointArc((57.214458866, 46.391567227), (52.052503596, 52.052503596), (46.391567227, 57.214458866))
        make_face()
        with BuildLine():
            ThreePointArc((50.236653382, 50.236653382), (50.236653382, 47.761779648), (47.761779648, 47.761779648))
            ThreePointArc((47.761779648, 47.761779648), (47.761779648, 50.236653382), (50.236653382, 50.236653382))
        make_face(mode=Mode.SUBTRACT)
    extrude(amount=BOSS_EXTRUDE7_4_DEPTH)

    # Fillet9
    fillet9_edges = [body_5.edges().sort_by_distance(p)[0] for p in [
        (-46.391567227, 57.214458866, -13.675),
        (-57.214458866, 46.391567227, -13.675),
    ]]
    fillet(fillet9_edges, radius=FILLET9_R)


solid = Compound([part.part, body_2.part, body_3.part, body_4.part, body_5.part])
